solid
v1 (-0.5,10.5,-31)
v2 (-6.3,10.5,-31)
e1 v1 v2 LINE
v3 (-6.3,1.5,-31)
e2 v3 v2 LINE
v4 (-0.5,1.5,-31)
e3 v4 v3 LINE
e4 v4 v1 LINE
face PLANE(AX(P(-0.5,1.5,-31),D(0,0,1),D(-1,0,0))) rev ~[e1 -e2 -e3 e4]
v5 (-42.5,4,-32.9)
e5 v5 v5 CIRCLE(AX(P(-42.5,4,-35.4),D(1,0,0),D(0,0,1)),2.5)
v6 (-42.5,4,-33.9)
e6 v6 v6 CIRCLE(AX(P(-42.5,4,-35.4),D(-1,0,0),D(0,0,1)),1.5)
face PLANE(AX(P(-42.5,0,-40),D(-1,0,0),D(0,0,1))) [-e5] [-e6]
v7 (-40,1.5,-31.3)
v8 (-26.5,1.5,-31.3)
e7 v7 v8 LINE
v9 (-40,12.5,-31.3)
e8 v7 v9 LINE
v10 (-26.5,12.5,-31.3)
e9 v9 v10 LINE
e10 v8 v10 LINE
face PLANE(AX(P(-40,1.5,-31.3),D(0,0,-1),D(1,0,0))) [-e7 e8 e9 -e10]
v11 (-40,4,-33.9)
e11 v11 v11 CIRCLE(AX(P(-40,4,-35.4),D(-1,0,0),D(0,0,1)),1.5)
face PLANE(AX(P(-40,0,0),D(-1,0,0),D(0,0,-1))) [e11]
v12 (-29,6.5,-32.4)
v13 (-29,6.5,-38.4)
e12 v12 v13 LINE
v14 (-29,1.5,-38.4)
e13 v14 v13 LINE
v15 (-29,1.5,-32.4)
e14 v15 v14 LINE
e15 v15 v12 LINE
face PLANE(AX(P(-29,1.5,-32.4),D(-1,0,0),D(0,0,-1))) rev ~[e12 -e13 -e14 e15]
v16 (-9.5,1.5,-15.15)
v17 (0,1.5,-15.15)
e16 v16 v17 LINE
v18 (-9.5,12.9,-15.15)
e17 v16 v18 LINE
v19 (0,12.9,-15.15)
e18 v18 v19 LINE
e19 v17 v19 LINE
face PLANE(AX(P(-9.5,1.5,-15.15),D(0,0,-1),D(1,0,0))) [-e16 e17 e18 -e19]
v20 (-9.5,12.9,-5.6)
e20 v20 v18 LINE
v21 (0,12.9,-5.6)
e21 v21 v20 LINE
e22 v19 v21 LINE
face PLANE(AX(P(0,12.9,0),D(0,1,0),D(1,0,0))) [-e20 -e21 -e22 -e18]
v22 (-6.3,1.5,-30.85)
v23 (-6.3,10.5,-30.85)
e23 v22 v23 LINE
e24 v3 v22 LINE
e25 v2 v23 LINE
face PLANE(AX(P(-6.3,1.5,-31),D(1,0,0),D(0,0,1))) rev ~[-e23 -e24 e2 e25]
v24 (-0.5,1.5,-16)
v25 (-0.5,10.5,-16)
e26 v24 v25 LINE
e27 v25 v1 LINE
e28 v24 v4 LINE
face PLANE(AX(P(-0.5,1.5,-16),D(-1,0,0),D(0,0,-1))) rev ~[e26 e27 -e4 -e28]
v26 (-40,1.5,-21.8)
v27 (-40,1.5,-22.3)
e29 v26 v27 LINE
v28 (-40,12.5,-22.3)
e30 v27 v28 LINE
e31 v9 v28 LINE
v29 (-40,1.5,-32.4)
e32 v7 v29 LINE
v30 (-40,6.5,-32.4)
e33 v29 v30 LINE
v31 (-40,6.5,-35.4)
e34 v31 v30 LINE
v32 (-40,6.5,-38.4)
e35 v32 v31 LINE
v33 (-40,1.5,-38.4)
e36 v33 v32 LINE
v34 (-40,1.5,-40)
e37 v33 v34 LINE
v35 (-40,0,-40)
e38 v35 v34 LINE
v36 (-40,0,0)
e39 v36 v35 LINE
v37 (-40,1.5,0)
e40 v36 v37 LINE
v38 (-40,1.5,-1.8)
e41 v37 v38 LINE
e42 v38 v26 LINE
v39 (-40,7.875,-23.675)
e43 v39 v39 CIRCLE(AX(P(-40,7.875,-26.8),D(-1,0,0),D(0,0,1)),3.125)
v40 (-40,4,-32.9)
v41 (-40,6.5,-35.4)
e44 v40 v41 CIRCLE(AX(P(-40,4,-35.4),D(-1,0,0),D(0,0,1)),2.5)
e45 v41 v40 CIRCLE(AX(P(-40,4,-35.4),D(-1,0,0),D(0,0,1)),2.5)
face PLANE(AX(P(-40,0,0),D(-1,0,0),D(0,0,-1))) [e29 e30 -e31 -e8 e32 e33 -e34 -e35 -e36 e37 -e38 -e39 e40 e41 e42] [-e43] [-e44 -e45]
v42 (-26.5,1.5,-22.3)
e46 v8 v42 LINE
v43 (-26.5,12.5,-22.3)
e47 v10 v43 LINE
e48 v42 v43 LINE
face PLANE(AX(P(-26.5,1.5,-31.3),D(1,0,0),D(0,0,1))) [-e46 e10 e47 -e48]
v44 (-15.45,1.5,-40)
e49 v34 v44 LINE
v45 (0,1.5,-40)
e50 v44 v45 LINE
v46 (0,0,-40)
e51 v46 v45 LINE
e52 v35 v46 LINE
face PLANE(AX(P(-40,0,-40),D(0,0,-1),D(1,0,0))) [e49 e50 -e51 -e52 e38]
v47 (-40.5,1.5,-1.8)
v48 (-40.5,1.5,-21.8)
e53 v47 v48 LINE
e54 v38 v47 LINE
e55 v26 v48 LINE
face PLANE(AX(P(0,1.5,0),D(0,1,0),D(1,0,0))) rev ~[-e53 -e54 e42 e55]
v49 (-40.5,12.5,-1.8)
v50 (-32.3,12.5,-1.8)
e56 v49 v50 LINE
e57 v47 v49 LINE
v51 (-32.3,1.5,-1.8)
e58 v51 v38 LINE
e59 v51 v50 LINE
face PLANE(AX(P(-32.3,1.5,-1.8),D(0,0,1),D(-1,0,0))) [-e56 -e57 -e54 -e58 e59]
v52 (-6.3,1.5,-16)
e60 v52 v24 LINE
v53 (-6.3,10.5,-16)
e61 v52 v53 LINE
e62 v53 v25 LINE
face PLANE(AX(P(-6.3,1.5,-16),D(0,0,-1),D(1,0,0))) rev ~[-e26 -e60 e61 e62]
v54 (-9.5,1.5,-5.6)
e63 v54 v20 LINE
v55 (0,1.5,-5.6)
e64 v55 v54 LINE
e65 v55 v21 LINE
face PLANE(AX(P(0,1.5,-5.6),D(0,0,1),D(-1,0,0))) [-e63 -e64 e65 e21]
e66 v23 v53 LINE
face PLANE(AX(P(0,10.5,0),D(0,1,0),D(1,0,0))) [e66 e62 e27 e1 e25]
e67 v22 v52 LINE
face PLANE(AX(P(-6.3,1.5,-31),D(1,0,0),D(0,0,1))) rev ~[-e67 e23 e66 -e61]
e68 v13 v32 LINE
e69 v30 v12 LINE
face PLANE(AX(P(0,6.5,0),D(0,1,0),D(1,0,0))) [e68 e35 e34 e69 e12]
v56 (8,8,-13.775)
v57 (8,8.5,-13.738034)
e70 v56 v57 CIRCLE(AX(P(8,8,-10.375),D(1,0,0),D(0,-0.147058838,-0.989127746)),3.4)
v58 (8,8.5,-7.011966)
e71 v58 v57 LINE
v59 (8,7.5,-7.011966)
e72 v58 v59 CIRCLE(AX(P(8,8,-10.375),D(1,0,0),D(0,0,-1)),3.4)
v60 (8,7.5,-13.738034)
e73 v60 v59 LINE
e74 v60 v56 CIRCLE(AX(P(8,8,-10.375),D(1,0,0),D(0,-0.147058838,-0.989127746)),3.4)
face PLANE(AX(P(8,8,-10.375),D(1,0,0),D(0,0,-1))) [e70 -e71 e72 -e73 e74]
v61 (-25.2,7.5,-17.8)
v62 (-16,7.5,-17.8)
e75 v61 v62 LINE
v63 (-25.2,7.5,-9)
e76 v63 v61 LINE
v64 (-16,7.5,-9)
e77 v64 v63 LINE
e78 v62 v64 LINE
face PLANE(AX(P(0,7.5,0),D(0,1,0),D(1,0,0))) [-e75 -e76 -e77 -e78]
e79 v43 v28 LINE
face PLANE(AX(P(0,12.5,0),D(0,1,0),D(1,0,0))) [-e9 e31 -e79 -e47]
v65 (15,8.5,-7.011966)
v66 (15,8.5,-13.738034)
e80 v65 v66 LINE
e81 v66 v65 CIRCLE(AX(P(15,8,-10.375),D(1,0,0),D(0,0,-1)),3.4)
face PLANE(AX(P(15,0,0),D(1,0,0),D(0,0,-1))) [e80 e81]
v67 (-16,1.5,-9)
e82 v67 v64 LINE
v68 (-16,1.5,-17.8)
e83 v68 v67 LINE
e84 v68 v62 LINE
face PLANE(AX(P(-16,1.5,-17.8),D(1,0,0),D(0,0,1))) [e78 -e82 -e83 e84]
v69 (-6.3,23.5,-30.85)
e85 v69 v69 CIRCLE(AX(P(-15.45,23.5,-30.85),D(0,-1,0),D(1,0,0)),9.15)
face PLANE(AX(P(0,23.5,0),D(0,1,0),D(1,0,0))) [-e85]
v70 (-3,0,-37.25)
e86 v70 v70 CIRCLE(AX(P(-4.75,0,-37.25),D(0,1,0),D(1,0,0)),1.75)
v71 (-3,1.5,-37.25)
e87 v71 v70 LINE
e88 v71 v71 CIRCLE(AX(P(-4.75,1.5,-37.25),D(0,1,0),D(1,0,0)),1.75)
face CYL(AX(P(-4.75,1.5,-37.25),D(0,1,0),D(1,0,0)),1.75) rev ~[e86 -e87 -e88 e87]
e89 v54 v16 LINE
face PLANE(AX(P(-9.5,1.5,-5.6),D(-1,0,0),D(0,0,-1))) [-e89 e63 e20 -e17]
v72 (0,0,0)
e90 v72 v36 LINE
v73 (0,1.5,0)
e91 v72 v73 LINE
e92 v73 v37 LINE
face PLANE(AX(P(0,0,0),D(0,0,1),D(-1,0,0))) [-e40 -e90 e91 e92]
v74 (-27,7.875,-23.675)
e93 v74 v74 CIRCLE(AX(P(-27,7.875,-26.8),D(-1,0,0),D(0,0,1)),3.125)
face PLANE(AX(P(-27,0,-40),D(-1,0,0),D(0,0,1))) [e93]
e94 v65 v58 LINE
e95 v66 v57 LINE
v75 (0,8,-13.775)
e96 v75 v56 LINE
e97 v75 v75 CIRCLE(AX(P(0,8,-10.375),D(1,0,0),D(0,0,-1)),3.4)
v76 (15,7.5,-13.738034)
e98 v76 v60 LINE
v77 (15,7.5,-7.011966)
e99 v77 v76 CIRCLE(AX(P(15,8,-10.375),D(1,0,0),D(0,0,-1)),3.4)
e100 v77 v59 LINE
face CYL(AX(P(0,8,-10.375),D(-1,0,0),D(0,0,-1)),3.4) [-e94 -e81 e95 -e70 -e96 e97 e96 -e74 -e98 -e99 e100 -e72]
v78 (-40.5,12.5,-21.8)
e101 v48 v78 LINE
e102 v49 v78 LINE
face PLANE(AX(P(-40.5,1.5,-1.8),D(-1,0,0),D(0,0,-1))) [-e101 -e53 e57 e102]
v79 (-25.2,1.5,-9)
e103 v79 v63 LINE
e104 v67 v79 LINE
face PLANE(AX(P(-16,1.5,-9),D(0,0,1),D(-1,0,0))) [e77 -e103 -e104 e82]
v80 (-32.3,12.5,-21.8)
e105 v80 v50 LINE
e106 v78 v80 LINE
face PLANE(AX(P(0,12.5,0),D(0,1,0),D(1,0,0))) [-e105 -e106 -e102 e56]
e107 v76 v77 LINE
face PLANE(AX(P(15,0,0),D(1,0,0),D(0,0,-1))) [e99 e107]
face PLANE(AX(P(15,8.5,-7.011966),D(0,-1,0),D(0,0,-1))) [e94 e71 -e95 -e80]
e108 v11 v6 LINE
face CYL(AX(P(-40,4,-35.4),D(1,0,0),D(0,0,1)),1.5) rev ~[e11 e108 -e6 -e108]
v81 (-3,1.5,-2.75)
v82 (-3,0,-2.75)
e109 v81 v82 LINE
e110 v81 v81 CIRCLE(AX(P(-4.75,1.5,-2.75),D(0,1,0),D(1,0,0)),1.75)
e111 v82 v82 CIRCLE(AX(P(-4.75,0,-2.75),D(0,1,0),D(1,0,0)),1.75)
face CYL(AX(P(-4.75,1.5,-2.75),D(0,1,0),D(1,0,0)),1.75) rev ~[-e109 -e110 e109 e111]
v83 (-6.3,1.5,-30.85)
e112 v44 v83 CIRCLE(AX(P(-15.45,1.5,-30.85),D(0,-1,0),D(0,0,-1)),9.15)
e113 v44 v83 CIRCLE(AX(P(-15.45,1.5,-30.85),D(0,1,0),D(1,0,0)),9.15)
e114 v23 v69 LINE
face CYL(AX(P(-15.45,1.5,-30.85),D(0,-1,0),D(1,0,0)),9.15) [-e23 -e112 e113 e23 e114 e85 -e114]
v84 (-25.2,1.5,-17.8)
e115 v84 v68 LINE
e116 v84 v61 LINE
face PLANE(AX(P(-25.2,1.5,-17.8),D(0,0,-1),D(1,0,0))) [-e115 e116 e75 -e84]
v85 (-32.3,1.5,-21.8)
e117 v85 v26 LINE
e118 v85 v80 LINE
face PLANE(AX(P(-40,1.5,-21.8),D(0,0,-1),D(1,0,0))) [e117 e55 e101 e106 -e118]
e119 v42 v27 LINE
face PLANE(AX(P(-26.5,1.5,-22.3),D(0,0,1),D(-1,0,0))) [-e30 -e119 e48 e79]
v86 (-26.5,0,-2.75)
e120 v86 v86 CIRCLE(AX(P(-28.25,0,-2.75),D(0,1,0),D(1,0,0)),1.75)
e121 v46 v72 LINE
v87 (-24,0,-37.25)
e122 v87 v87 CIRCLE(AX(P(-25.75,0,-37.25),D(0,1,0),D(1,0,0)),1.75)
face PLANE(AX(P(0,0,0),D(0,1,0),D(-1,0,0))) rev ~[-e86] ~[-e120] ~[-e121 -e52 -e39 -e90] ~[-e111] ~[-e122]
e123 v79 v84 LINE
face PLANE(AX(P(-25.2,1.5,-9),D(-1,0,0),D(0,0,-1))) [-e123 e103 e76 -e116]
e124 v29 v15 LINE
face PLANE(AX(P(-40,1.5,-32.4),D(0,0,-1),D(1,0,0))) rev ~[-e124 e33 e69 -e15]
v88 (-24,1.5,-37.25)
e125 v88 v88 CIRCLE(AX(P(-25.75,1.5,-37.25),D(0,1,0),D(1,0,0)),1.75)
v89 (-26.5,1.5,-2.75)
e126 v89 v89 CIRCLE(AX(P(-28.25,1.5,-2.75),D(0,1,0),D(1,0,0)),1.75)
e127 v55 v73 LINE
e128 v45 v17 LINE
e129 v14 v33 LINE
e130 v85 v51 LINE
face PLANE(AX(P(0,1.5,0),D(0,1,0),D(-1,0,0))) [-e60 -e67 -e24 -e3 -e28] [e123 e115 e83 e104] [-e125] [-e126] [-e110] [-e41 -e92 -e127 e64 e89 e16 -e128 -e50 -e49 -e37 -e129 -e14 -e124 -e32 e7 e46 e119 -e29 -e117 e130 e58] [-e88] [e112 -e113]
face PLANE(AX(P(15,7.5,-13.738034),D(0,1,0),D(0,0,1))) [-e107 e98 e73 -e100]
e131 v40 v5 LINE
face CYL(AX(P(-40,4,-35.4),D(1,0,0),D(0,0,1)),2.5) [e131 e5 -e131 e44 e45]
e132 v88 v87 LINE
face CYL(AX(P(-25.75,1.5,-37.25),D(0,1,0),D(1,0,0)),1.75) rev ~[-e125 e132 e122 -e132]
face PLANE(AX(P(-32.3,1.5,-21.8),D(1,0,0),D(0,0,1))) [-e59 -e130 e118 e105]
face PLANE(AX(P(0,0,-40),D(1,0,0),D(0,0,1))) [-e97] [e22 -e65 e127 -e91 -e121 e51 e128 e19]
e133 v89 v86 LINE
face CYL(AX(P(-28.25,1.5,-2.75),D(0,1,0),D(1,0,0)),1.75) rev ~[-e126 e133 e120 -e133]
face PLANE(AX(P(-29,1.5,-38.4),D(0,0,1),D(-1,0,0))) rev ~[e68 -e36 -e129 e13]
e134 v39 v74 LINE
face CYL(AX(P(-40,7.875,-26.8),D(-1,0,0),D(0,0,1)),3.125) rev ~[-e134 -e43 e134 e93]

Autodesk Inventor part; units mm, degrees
ref_plane "YZ Plane" through (0, 0, 0) normal (1, 0, 0) x (0, 1, 0)
ref_plane "XZ Plane" through (0, 0, 0) normal (0, 1, 0) x (-1, 0, 0)
ref_plane "XY Plane" through (0, 0, 0) normal (0, 0, 1) x (1, 0, 0)
sketch "Sketch1" plane through (0, 0, 0) normal (0, 1, 0) x (-1, 0, 0)
  line L0 (0, 0) -> (40, 0)
  line L1 (40, 0) -> (40, -40)
  line L2 (40, -40) -> (0, -40)
  line L3 (0, -40) -> (0, 0)
  dimension "d0" = 40
  dimension "d1" = 40
extrude "Extrusion1" add sketch "Sketch1" along normal blind 1.5
sketch "Sketch2" plane through (0, 1.5, 0) normal (0, 1, 0) x (1, 0, 0)
  circle A0 centre (-4.75, 37.25) radius 1.75
  circle A1 centre (-25.75, 37.25) radius 1.75
  circle A2 centre (-28.25, 2.75) radius 1.75
  circle A3 centre (-4.75, 2.75) radius 1.75
  circle A4 centre (-15.45, 30.85) radius 9.15
  line L0 (-40, 32.4) -> (-29, 32.4)
  line L1 (-29, 32.4) -> (-29, 38.4)
  line L2 (-29, 38.4) -> (-40, 38.4)
  line L3 (-40, 38.4) -> (-40, 32.4)
  line L4 (-40.5, 31.3) -> (-26.5, 31.3)
  line L5 (-26.5, 31.3) -> (-26.5, 22.3)
  line L6 (-26.5, 22.3) -> (-40.5, 22.3)
  line L7 (-40.5, 22.3) -> (-40.5, 31.3)
  line L8 (-40.5, 21.8) -> (-32.3, 21.8)
  line L9 (-32.3, 21.8) -> (-32.3, 1.8)
  line L10 (-32.3, 1.8) -> (-40.5, 1.8)
  line L11 (-40.5, 1.8) -> (-40.5, 21.8)
  line L12 (-9.5, 15.15) -> (0, 15.15)
  line L13 (0, 15.15) -> (0, 5.6)
  line L14 (0, 5.6) -> (-9.5, 5.6)
  line L15 (-9.5, 5.6) -> (-9.5, 15.15)
  line L16 (-6.3, 31) -> (-0.5, 31)
  line L17 (-0.5, 31) -> (-0.5, 16)
  line L18 (-0.5, 16) -> (-6.3, 16)
  line L19 (-6.3, 16) -> (-6.3, 31)
  line L20 (-25.2, 17.8) -> (-16, 17.8)
  line L21 (-16, 17.8) -> (-16, 9)
  line L22 (-16, 9) -> (-25.2, 9)
  line L23 (-25.2, 9) -> (-25.2, 17.8)
  line L24 (-40, 0) -> (0, 0) projected
  line L25 (0, 40) -> (-40, 40) projected
  line L26 (-40, 40) -> (-40, 0) projected
  line L27 (-40, 0) -> (0, 0) projected
  line L28 (0, 0) -> (0, 40) projected
  line L29 (0, 40) -> (-40, 40) projected
  point P0 (-36.4, 1.8)
  point P1 (-40, 31.3)
  point P2 (-40, 22.3)
  dimension "d4" = 3.5
  dimension "d5" = 3.5
  dimension "d6" = 3.5
  dimension "d7" = 3.5
  dimension "d8" = 18.3
  dimension "d9" = 8.2
  dimension "d10" = 20
  dimension "d11" = 8.8
  dimension "d12" = 9.2
  dimension "d13" = 9.55
  dimension "d14" = 9.5
  dimension "d15" = 15
  dimension "d16" = 5.8
  dimension "d17" = 11
  dimension "d18" = 6
  dimension "d21" = 9
  dimension "d22" = 14
  dimension "d23" = 5.6
  dimension "d24" = 4.75
  dimension "d25" = 2.75
  dimension "d26" = 0.5
  dimension "d27" = 9
  dimension "d28" = 9
  dimension "d29" = 6.5
  dimension "d30" = 9.15
  dimension "d31" = 9.15
  dimension "d32" = 2.75
  dimension "d33" = 0.5
  dimension "d34" = 1.8
  dimension "d35" = 1.6
  dimension "d37" = 0.5
  dimension "d38" = 0.5
  dimension "d39" = 11.75
  dimension "d40" = 2.75
  dimension "d41" = 2.75
  dimension "d42" = 4.75
  dimension "d43" = 14.25
extrude "Extrusion2" add sketch "Sketch2" along normal blind 6 contours L20 L21 L22 L23
extrude "Extrusion3" add sketch "Sketch2" along normal blind 22 contours A4
extrude "Extrusion4" cut sketch "Sketch2" against normal through all contours A0 | A1 | A2 | A3
extrude "Extrusion5" add sketch "Sketch2" along normal blind 11 contours L26 L8 L9 L10 | L10 L11 L8 L26
extrude "Extrusion6" add sketch "Sketch2" along normal blind 11.4 contours L13 L14 L15 L12
sketch "Sketch2 outline for Extrusion7" plane through (0, 1.5, 0) normal (0, 1, 0) x (1, 0, 0)
  line L0 (-6.3, 16) -> (-0.5, 16)
  line L1 (-6.3, 31) -> (-6.3, 16)
  line L2 (-0.5, 31) -> (-6.3, 31)
  line L3 (-0.5, 16) -> (-0.5, 31)
extrude "Extrusion7" add sketch "Sketch2 outline for Extrusion7" along normal blind 9
extrude "Extrusion8" add sketch "Sketch2" along normal blind 11 contours L4 L5 L6 L26
extrude "Extrusion9" add sketch "Sketch2" along normal blind 5 contours L2 L1 L0 L3
sketch "Sketch3" plane through (-40, 0, -40) normal (-1, 0, 0) x (0, 0, 1)
  line L0 (8.7, 12.5) -> (17.7, 12.5) projected
  line L1 (8.7, 1.5) -> (8.7, 12.5) projected
  line L2 (17.7, 1.5) -> (17.7, 12.5) projected
  circle A0 centre (13.2, 7.875) radius 3.125
  point P0 (40, 0)
  dimension "d60" = 6.25
  dimension "d61" = 4.625
extrude "Extrusion10" cut sketch "Sketch3" against normal blind 13
sketch "Sketch4" plane through (-40, 0, -40) normal (-1, 0, 0) x (0, 0, 1)
  line L0 (1.6, 1.5) -> (1.6, 6.5) projected
  line L1 (1.6, 6.5) -> (7.6, 6.5) projected
  line L2 (7.6, 1.5) -> (7.6, 6.5) projected
  circle A0 centre (4.6, 4) radius 2.5
  circle A1 centre (4.6, 4) radius 1.5
  point P0 (40, 0)
  dimension "d64" = 5
  dimension "d65" = 1
  dimension "d66" = 6
  dimension "d67" = 3
extrude "Extrusion11" add sketch "Sketch4" along normal blind 2.5
sketch "Sketch5" plane through (0, 0, 0) normal (1, 0, 0) x (0, 0, -1)
  circle A0 centre (10.375, 8) radius 3.4
  line L0 (15.15, 1.5) -> (15.15, 12.9) projected
  line L1 (5.6, 12.9) -> (15.15, 12.9) projected
  line L2 (5.6, 1.5) -> (5.6, 12.9) projected
  point P0 (0, 0)
  dimension "d70" = 6.8
  dimension "d71" = 4.9
  dimension "d72" = 4.775
  dimension "d73" = 9.55
extrude "Extrusion12" add sketch "Sketch5" along normal blind 15
sketch "Sketch6" plane through (15, 8, -10.375) normal (1, 0, 0) x (0, 0, -1)
  circle A0 centre (0, 0) radius 3.4
  line L0 (-3.363034, 0.5) -> (3.363034, 0.5)
  line L1 (3.363034, 0.5) -> (3.363034, -0.5)
  line L2 (3.363034, -0.5) -> (-3.363034, -0.5)
  line L3 (-3.363034, -0.5) -> (-3.363034, 0.5)
  line L4 (-3.363034, 0.5) -> (3.363034, -0.5) construction
  line L5 (3.363034, 0.5) -> (-3.363034, -0.5) construction
  point P0 (-3.363034, 0.5)
  point P1 (-3.363034, -0.5)
  point P2 (3.363034, 0.5)
  dimension "d76" = 1
extrude "Extrusion13" cut sketch "Sketch6" against normal blind 7 contours A0 L1 | L1 L2 L3 L0 | L3 A0
equation "\"d5\" = d4"
equation "\"d6\" = d5"
equation "\"d7\" = d4"
equation "\"d30\" = 0.5 * d8"
equation "\"d31\" = 0.5 * d8"
properties part number "amp"
